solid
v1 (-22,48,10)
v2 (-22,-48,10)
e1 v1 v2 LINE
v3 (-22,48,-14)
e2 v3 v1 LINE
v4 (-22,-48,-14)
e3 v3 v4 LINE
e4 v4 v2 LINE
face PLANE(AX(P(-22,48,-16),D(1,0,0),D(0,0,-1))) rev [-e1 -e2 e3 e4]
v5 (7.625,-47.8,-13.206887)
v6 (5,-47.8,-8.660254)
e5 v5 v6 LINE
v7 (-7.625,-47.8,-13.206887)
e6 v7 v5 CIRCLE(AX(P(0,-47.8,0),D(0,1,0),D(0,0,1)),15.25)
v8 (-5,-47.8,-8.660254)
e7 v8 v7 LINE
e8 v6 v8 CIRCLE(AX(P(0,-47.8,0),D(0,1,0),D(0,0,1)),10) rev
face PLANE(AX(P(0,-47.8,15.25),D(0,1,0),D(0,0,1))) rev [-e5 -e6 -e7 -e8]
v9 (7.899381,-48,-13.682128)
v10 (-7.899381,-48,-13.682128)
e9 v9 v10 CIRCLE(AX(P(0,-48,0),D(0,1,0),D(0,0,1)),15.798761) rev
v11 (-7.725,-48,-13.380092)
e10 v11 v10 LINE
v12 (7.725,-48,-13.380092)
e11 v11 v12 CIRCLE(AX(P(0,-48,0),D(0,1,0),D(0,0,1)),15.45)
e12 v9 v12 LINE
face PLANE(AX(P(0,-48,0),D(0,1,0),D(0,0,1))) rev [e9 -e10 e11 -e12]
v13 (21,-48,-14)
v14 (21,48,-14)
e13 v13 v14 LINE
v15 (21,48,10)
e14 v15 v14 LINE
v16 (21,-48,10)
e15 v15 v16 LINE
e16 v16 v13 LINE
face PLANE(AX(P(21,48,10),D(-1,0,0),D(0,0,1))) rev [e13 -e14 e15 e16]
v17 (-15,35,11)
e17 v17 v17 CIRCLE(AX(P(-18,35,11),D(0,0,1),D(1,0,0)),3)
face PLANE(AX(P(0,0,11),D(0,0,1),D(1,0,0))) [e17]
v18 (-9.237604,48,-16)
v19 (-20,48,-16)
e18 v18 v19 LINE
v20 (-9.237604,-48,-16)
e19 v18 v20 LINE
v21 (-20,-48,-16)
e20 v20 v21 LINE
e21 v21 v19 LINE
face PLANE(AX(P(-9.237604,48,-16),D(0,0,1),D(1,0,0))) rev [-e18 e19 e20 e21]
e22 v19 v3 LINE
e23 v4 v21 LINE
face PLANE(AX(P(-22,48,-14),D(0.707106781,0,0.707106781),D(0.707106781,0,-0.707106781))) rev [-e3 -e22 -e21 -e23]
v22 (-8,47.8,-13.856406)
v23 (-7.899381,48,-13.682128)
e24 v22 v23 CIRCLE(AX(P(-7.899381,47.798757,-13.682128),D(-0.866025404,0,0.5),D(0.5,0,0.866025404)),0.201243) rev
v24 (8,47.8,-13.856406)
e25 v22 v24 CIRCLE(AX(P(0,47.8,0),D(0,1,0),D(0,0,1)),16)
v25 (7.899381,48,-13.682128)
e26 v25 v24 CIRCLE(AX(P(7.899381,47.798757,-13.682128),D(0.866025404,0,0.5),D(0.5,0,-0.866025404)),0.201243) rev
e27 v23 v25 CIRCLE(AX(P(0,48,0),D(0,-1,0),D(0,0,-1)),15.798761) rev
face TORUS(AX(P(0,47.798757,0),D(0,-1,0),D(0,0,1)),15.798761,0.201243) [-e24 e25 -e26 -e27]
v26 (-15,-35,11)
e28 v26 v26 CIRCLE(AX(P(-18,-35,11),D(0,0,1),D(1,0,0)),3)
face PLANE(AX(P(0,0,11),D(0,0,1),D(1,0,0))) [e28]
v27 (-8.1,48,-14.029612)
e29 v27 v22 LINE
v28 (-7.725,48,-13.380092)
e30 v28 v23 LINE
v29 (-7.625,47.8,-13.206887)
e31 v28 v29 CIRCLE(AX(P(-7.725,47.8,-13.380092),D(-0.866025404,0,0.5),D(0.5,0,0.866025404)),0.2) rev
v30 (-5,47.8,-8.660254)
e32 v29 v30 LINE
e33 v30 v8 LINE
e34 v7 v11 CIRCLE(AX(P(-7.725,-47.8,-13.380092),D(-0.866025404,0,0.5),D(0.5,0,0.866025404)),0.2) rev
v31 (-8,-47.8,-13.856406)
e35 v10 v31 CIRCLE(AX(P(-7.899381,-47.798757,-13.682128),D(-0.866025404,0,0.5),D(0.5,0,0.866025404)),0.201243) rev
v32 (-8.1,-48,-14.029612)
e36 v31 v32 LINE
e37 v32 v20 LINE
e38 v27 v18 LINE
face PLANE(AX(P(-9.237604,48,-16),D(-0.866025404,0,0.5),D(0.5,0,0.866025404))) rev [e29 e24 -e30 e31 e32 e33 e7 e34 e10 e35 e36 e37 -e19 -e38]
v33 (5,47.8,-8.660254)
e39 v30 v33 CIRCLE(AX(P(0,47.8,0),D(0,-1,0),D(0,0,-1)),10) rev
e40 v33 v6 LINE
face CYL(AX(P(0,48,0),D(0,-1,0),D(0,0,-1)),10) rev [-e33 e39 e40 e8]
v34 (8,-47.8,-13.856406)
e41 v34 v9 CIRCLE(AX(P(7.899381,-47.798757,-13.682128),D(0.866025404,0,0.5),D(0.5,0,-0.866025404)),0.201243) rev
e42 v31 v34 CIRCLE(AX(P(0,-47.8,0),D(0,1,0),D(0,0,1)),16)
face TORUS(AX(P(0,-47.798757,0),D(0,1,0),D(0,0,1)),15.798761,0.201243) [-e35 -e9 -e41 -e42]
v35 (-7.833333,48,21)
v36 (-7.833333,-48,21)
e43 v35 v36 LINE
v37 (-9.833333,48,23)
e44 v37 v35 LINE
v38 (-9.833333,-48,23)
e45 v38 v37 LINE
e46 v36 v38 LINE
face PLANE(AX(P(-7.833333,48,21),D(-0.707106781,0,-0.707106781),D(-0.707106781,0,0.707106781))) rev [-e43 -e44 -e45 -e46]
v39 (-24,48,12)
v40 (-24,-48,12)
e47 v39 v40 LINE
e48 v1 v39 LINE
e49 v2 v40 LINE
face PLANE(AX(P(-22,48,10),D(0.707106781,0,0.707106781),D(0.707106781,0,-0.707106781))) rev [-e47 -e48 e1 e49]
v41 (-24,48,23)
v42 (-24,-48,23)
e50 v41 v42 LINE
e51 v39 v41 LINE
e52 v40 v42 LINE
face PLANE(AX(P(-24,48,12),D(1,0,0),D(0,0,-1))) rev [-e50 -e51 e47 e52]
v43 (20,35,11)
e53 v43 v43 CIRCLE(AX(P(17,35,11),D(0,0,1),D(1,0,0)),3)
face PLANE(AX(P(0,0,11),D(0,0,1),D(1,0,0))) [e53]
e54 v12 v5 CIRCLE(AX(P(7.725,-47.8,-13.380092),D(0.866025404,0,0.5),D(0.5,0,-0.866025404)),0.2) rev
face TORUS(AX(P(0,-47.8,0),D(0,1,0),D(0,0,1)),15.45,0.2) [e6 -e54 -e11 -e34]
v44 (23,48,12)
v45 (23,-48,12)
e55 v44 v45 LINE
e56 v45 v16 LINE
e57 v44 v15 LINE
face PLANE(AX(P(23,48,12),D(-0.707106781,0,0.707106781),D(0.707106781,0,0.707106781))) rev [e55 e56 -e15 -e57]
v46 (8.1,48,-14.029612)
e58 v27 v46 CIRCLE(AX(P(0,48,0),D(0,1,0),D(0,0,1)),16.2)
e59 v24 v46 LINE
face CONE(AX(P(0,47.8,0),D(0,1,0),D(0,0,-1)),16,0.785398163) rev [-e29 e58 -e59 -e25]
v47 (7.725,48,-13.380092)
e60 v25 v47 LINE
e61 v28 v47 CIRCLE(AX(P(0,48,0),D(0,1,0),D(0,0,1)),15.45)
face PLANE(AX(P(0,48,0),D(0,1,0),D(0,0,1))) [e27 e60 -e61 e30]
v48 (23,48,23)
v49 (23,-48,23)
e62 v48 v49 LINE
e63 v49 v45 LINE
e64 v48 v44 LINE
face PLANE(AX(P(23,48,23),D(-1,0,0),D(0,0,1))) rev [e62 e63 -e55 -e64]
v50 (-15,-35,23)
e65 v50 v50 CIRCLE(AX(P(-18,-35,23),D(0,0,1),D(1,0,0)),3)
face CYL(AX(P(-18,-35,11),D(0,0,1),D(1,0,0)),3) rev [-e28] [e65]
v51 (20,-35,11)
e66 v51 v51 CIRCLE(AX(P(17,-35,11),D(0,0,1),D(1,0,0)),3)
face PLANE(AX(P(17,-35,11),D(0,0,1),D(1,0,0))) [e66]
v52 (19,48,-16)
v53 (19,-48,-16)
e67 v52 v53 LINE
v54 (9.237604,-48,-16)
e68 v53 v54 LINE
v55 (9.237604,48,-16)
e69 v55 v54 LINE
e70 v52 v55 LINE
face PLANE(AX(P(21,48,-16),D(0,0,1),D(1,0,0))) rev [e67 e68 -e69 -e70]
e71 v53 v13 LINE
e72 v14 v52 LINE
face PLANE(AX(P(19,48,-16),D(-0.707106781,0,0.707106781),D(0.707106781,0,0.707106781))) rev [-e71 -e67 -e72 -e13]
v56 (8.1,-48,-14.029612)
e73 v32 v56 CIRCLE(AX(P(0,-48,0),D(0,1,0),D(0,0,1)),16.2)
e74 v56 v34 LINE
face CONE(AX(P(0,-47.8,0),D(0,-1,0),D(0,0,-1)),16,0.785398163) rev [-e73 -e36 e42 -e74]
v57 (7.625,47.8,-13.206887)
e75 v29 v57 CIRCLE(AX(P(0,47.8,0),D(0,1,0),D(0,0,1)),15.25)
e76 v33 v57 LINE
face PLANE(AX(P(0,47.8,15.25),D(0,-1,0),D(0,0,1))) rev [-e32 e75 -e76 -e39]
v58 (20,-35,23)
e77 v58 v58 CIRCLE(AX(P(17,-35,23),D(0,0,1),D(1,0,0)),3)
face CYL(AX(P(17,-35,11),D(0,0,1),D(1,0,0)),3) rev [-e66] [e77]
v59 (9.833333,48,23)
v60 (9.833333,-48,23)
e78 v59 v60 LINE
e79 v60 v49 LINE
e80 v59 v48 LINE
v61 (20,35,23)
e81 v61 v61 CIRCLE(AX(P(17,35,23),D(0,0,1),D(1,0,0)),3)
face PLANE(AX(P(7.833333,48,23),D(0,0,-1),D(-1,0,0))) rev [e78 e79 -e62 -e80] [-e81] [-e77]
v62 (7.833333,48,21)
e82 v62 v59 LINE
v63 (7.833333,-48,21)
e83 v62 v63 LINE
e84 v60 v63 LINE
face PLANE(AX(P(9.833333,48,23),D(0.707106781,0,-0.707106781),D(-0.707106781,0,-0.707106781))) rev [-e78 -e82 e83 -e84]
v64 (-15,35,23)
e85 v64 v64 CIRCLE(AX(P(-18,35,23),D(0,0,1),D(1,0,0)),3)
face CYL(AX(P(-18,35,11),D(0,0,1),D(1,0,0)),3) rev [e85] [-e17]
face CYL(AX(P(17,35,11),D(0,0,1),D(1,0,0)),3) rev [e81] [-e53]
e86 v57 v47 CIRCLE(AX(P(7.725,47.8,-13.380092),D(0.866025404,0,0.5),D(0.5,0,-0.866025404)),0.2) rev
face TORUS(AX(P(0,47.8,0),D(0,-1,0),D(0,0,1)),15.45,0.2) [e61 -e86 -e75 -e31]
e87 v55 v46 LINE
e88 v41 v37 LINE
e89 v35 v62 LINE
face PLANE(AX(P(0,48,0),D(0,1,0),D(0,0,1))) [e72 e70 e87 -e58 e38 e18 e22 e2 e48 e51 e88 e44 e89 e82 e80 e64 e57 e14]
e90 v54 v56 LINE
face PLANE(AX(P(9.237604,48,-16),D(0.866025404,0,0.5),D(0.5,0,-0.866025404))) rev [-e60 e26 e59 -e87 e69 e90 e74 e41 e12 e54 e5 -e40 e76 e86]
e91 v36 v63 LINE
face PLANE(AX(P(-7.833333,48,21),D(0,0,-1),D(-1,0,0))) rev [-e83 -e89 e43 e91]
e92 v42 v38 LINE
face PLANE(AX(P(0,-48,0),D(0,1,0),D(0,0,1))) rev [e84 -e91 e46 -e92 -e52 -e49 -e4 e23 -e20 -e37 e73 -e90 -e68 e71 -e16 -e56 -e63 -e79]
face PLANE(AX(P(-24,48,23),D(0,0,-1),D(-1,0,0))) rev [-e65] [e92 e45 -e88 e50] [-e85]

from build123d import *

# Parameters (mm, degrees)
EXTRUDE_2_DEPTH     = 96
CHAMFER_1_SIZE      = 2
SKETCH_5_R          = 3
CUT_EXTRUDE_1_DEPTH = 12
CHAMFER_2_SIZE      = 2


with BuildPart() as part:
    # 草图4 → 拉伸2 (new body)
    with BuildSketch(Plane(origin=(0, -48, 0), x_dir=(-1, 0, 0), z_dir=(0, 1, 0))):
        with BuildLine():
            Line((7.833333333, 21), (-7.833333333, 21))
            Line((-7.833333333, 21), (-7.833333333, 23))
            Line((-7.833333333, 23), (-23, 23))
            Line((-23, 23), (-23, 12))
            Line((-23, 12), (-21, 10))
            Line((-21, 10), (-21, -16))
            Line((-21, -16), (-9.237604307, -16))
            Line((-9.237604307, -16), (-5, -8.660254038))
            ThreePointArc((-5, -8.660254038), (0, 10), (5, -8.660254038))
            Line((5, -8.660254038), (9.237604307, -16))
            Line((9.237604307, -16), (22, -16))
            Line((22, -16), (22, 10))
            Line((22, 10), (24, 12))
            Line((24, 12), (24, 23))
            Line((24, 23), (7.833333333, 23))
            Line((7.833333333, 23), (7.833333333, 21))
        make_face()
    extrude(amount=EXTRUDE_2_DEPTH)

    # 倒角1
    chamfer_1_edges = [part.edges().sort_by_distance(p)[0] for p in [
        (-7.833333333, 0, 23),
        (7.833333333, 0, 23),
    ]]
    chamfer(chamfer_1_edges, length=CHAMFER_1_SIZE - 0.0001)  # a hair under: the kernel refuses the full size

    # 草图5 → 切除-拉伸1 (cut)
    with BuildSketch(Plane.XY.offset(23)):
        with Locations((-18, 35)):
            Circle(SKETCH_5_R)
        with Locations((17, 35)):
            Circle(SKETCH_5_R)
        with Locations((17, -35)):
            Circle(SKETCH_5_R)
        with Locations((-18, -35)):
            Circle(SKETCH_5_R)
    extrude(amount=-CUT_EXTRUDE_1_DEPTH, mode=Mode.SUBTRACT)

    # 倒角2
    chamfer_2_edges = [part.edges().sort_by_distance(p)[0] for p in [
        (-22, 0, -16),
        (21, 0, -16),
    ]]
    chamfer(chamfer_2_edges, length=CHAMFER_2_SIZE)

    # 草图6 → 切除-旋转1 (revolve, cut)
    with BuildSketch(Plane(origin=(0, 0, 0), x_dir=(0, 0, -1), z_dir=(1, 0, 0))):
        with BuildLine():
            Line((-16.2, -48), (-16, -47.8))
            ThreePointArc((-16, -47.8), (-15.940621125, -47.941496067), (-15.798761062, -48))
            Line((-15.798761062, -48), (-16.2, -48))
        make_face()
        with BuildLine():
            Line((-15.45, -48), (0, -48))
            Line((0, -48), (0, -47.8))
            Line((0, -47.8), (-15.25, -47.8))
            ThreePointArc((-15.25, -47.8), (-15.308578644, -47.941421356), (-15.45, -48))
        make_face()
    cut_revolve_1 = revolve(axis=Axis((0, -10.264906919, 0), (0, -1, 0)), mode=Mode.SUBTRACT)

    # 镜向1: 切除-旋转1 across plane
    add(cut_revolve_1.mirror(Plane.ZX), mode=Mode.SUBTRACT)


solid = part.part
